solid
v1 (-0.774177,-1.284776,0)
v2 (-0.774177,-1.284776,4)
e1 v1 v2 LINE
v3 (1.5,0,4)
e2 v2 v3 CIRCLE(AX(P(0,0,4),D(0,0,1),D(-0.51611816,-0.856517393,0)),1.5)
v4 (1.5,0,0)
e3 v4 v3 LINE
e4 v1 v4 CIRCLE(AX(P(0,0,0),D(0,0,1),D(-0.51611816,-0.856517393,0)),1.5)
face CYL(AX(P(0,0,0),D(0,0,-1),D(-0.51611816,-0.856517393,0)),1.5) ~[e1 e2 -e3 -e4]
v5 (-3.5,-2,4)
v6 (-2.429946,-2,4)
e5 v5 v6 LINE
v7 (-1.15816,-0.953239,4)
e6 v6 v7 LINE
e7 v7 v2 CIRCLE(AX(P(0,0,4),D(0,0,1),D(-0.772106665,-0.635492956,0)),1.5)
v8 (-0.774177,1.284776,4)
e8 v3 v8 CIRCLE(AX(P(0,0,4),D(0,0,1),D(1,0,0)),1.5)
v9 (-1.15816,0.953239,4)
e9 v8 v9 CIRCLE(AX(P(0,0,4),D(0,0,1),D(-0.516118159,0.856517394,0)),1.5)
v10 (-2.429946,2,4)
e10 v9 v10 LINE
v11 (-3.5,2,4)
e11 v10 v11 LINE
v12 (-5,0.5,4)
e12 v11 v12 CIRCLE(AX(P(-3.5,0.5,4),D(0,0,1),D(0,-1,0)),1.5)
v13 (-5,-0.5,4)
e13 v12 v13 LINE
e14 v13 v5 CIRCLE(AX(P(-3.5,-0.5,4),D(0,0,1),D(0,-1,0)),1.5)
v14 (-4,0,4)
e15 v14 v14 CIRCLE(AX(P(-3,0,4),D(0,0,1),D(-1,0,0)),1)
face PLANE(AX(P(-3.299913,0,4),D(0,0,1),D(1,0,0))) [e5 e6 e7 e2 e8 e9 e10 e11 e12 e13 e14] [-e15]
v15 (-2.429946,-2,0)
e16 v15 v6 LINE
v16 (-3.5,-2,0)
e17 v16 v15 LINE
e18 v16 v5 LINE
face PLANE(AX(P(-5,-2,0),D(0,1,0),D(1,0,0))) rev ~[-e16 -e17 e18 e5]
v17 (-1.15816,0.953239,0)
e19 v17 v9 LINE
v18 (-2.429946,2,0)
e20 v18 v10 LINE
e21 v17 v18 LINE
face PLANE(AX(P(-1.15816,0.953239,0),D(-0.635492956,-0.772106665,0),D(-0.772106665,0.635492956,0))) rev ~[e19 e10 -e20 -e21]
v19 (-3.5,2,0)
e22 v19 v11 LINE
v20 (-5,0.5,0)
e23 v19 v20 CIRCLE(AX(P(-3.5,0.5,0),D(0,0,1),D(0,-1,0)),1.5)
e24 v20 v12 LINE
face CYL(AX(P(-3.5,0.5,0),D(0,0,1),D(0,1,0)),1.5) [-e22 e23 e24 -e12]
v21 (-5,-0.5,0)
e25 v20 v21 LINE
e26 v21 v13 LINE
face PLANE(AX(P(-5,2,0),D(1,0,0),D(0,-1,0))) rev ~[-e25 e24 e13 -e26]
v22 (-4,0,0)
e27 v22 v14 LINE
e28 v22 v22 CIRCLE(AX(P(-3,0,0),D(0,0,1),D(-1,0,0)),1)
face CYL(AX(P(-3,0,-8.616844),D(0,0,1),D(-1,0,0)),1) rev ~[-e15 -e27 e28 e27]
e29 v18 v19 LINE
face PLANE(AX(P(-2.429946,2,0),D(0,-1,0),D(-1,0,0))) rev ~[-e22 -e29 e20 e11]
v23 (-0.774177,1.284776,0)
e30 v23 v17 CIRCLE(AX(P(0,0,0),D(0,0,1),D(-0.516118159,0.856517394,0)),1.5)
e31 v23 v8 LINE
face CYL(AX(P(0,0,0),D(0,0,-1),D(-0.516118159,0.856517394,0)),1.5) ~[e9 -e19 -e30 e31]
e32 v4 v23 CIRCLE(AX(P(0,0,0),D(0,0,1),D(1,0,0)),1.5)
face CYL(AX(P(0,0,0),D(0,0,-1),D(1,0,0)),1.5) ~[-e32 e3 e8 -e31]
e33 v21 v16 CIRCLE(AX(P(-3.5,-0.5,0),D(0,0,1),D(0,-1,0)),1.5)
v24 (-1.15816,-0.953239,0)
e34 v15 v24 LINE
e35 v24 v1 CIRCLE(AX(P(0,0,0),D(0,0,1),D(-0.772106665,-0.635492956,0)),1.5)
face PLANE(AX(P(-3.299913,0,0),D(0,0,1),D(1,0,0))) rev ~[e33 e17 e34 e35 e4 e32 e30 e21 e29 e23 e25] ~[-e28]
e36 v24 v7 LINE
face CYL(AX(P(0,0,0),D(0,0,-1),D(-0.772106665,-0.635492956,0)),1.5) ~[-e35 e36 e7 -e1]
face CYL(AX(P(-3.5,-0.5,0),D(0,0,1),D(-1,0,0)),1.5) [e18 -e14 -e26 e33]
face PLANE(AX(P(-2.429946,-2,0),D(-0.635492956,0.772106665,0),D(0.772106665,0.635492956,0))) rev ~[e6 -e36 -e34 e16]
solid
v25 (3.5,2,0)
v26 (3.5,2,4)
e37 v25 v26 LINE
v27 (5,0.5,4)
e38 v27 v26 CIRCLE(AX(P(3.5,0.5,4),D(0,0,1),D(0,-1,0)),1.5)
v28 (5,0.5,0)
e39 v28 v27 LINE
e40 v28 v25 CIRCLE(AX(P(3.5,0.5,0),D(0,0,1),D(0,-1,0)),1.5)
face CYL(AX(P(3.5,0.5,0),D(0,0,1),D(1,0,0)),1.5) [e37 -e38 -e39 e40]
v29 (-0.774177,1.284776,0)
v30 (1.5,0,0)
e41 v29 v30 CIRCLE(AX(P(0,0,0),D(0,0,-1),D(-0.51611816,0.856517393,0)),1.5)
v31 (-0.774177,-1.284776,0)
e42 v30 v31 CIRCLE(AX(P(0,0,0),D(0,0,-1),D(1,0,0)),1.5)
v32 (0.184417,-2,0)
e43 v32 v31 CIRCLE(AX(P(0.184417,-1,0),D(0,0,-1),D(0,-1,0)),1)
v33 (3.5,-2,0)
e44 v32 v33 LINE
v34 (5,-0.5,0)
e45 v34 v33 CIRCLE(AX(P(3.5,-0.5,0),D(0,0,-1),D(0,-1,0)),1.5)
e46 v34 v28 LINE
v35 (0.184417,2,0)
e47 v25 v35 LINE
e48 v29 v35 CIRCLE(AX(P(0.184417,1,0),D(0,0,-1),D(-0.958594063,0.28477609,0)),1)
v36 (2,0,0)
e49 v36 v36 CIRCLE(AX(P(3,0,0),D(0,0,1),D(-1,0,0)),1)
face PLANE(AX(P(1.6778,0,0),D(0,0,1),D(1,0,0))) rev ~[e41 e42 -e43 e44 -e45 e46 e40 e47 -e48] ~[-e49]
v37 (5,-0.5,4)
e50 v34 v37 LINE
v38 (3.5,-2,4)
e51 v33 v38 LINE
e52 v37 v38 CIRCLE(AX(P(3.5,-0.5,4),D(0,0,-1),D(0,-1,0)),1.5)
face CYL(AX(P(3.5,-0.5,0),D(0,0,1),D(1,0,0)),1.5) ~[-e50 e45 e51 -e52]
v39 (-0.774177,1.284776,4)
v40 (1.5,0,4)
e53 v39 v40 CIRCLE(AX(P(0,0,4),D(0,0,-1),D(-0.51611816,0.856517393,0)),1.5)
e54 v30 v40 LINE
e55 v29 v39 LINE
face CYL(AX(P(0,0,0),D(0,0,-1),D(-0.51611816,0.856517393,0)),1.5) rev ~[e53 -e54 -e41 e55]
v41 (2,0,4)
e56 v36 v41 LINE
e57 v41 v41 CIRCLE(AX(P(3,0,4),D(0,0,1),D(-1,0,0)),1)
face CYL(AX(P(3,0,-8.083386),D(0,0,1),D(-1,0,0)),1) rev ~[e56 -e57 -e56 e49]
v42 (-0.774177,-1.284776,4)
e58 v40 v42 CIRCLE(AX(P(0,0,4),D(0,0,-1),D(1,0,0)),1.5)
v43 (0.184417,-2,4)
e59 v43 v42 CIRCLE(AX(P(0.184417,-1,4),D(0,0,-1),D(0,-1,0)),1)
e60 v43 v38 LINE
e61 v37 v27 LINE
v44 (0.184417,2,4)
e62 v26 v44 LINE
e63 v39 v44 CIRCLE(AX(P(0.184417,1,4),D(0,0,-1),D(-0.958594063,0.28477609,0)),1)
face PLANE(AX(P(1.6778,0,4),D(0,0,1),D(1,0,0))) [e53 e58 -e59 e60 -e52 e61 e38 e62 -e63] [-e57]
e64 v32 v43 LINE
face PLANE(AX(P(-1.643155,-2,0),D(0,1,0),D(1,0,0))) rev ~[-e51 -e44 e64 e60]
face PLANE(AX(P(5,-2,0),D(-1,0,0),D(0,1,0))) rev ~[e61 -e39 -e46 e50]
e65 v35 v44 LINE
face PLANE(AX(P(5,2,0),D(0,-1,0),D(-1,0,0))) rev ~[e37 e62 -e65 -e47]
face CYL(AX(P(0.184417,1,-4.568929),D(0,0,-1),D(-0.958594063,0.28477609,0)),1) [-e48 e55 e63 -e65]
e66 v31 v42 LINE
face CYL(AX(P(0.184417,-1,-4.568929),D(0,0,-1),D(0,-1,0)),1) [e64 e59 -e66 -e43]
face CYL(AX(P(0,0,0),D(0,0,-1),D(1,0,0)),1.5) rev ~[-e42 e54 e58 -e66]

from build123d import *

# Parameters (mm, degrees)
F1_DEPTH    = 4
F2_DEPTH    = 4
F3_R        = 1.5
F3_2_R      = 1.5
F4_T1_DEPTH = 13.1378583471
F5_D        = 2
F5_2_D      = 2


# Not quite as in the source:
# - a fillet or chamfer that OpenCascade refuses, or shapes differently, is made with other operations: its cross-section is extruded or revolved along the edge and cut away or added


with BuildPart() as f1:
    # F0 (on Top) → F1 (new body)
    with BuildSketch(Plane.XY):
        with BuildLine():
            Line((-1.1581599978, 0.9532394345), (-2.4299456272, 2))
            Line((-2.4299456272, 2), (-5, 2))
            Line((-5, 2), (-5, -2))
            Line((-5, -2), (-2.4299456272, -2))
            Line((-2.4299456272, -2), (-1.1581599978, -0.9532394345))
            ThreePointArc((-1.1581599978, -0.9532394345), (-1.5, 0), (-1.1581599978, 0.9532394345))
        make_face()
        with BuildLine():
            ThreePointArc((1.5, 0), (0.7378123545, 1.3059988245), (-0.7741772393, 1.2847760902))
            ThreePointArc((-0.7741772393, 1.2847760902), (-0.9802861511, 1.135358561), (-1.1581599978, 0.9532394345))
            ThreePointArc((-1.1581599978, 0.9532394345), (-1.5, 0), (-1.1581599978, -0.9532394345))
            ThreePointArc((-1.1581599978, -0.9532394345), (-0.9802861511, -1.135358561), (-0.7741772393, -1.2847760902))
            ThreePointArc((-0.7741772393, -1.2847760902), (0.7378123545, -1.3059988245), (1.5, 0))
        make_face()
    extrude(amount=F1_DEPTH)

    # F3
    f3_edges = [f1.edges().sort_by_distance(p)[0] for p in [
        (-5, -2, 2),
        (-5, 2, 2),
    ]]
    fillet(f3_edges, radius=F3_R)

    # F5 (through all)
    with Locations(Plane(origin=(0, 0, 0), x_dir=(1, 0, 0), z_dir=(0, 0, -1))):
        with Locations((3, 0), (-3, 0)):
            Hole(F5_D / 2)


with BuildPart() as f2:
    # F0 (on Top) → F2 (new body)
    with BuildSketch(Plane.XY):
        with BuildLine():
            Line((5, -2), (5, 2))
            Line((5, 2), (-1.6431548453, 2))
            Line((-1.6431548453, 2), (-0.7741772393, 1.2847760902))
            ThreePointArc((-0.7741772393, 1.2847760902), (0.7378123545, 1.3059988245), (1.5, 0))
            ThreePointArc((1.5, 0), (0.7378123545, -1.3059988245), (-0.7741772393, -1.2847760902))
            Line((-0.7741772393, -1.2847760902), (-1.6431548453, -2))
            Line((-1.6431548453, -2), (5, -2))
        make_face()
    extrude(amount=F2_DEPTH)

    # F3#2
    f3_2_edges = [f2.edges().sort_by_distance(p)[0] for p in [
        (5, -2, 2),
        (5, 2, 2),
    ]]
    fillet(f3_2_edges, radius=F3_2_R)

    # F4: fillet of radius 1 on 2 edges, made by hand

    # F4_s2 → F4_t1 (cut)
    with BuildSketch(Plane.XY.offset(-4.5689291735)):
        with BuildLine():
            ThreePointArc((-0.7741772393, 1.2847760902), (-0.4135898271, 1.8014911385), (0.1844168241, 2))
            Line((0.1844168241, 2), (-1.6431548453, 2))
            Line((-1.6431548453, 2), (-0.7741772393, 1.2847760902))
        make_face()
        with BuildLine():
            ThreePointArc((0.1844168241, -2), (-0.4135898271, -1.8014911385), (-0.7741772393, -1.2847760902))
            Line((-0.7741772393, -1.2847760902), (-1.6431548453, -2))
            Line((-1.6431548453, -2), (0.1844168241, -2))
        make_face()
    extrude(amount=F4_T1_DEPTH, mode=Mode.SUBTRACT)

    # F5#2 (through all)
    with Locations(Plane(origin=(0, 0, 0), x_dir=(1, 0, 0), z_dir=(0, 0, -1))):
        with Locations((3, 0), (-3, 0)):
            Hole(F5_2_D / 2)


solid = Compound([f1.part, f2.part])
